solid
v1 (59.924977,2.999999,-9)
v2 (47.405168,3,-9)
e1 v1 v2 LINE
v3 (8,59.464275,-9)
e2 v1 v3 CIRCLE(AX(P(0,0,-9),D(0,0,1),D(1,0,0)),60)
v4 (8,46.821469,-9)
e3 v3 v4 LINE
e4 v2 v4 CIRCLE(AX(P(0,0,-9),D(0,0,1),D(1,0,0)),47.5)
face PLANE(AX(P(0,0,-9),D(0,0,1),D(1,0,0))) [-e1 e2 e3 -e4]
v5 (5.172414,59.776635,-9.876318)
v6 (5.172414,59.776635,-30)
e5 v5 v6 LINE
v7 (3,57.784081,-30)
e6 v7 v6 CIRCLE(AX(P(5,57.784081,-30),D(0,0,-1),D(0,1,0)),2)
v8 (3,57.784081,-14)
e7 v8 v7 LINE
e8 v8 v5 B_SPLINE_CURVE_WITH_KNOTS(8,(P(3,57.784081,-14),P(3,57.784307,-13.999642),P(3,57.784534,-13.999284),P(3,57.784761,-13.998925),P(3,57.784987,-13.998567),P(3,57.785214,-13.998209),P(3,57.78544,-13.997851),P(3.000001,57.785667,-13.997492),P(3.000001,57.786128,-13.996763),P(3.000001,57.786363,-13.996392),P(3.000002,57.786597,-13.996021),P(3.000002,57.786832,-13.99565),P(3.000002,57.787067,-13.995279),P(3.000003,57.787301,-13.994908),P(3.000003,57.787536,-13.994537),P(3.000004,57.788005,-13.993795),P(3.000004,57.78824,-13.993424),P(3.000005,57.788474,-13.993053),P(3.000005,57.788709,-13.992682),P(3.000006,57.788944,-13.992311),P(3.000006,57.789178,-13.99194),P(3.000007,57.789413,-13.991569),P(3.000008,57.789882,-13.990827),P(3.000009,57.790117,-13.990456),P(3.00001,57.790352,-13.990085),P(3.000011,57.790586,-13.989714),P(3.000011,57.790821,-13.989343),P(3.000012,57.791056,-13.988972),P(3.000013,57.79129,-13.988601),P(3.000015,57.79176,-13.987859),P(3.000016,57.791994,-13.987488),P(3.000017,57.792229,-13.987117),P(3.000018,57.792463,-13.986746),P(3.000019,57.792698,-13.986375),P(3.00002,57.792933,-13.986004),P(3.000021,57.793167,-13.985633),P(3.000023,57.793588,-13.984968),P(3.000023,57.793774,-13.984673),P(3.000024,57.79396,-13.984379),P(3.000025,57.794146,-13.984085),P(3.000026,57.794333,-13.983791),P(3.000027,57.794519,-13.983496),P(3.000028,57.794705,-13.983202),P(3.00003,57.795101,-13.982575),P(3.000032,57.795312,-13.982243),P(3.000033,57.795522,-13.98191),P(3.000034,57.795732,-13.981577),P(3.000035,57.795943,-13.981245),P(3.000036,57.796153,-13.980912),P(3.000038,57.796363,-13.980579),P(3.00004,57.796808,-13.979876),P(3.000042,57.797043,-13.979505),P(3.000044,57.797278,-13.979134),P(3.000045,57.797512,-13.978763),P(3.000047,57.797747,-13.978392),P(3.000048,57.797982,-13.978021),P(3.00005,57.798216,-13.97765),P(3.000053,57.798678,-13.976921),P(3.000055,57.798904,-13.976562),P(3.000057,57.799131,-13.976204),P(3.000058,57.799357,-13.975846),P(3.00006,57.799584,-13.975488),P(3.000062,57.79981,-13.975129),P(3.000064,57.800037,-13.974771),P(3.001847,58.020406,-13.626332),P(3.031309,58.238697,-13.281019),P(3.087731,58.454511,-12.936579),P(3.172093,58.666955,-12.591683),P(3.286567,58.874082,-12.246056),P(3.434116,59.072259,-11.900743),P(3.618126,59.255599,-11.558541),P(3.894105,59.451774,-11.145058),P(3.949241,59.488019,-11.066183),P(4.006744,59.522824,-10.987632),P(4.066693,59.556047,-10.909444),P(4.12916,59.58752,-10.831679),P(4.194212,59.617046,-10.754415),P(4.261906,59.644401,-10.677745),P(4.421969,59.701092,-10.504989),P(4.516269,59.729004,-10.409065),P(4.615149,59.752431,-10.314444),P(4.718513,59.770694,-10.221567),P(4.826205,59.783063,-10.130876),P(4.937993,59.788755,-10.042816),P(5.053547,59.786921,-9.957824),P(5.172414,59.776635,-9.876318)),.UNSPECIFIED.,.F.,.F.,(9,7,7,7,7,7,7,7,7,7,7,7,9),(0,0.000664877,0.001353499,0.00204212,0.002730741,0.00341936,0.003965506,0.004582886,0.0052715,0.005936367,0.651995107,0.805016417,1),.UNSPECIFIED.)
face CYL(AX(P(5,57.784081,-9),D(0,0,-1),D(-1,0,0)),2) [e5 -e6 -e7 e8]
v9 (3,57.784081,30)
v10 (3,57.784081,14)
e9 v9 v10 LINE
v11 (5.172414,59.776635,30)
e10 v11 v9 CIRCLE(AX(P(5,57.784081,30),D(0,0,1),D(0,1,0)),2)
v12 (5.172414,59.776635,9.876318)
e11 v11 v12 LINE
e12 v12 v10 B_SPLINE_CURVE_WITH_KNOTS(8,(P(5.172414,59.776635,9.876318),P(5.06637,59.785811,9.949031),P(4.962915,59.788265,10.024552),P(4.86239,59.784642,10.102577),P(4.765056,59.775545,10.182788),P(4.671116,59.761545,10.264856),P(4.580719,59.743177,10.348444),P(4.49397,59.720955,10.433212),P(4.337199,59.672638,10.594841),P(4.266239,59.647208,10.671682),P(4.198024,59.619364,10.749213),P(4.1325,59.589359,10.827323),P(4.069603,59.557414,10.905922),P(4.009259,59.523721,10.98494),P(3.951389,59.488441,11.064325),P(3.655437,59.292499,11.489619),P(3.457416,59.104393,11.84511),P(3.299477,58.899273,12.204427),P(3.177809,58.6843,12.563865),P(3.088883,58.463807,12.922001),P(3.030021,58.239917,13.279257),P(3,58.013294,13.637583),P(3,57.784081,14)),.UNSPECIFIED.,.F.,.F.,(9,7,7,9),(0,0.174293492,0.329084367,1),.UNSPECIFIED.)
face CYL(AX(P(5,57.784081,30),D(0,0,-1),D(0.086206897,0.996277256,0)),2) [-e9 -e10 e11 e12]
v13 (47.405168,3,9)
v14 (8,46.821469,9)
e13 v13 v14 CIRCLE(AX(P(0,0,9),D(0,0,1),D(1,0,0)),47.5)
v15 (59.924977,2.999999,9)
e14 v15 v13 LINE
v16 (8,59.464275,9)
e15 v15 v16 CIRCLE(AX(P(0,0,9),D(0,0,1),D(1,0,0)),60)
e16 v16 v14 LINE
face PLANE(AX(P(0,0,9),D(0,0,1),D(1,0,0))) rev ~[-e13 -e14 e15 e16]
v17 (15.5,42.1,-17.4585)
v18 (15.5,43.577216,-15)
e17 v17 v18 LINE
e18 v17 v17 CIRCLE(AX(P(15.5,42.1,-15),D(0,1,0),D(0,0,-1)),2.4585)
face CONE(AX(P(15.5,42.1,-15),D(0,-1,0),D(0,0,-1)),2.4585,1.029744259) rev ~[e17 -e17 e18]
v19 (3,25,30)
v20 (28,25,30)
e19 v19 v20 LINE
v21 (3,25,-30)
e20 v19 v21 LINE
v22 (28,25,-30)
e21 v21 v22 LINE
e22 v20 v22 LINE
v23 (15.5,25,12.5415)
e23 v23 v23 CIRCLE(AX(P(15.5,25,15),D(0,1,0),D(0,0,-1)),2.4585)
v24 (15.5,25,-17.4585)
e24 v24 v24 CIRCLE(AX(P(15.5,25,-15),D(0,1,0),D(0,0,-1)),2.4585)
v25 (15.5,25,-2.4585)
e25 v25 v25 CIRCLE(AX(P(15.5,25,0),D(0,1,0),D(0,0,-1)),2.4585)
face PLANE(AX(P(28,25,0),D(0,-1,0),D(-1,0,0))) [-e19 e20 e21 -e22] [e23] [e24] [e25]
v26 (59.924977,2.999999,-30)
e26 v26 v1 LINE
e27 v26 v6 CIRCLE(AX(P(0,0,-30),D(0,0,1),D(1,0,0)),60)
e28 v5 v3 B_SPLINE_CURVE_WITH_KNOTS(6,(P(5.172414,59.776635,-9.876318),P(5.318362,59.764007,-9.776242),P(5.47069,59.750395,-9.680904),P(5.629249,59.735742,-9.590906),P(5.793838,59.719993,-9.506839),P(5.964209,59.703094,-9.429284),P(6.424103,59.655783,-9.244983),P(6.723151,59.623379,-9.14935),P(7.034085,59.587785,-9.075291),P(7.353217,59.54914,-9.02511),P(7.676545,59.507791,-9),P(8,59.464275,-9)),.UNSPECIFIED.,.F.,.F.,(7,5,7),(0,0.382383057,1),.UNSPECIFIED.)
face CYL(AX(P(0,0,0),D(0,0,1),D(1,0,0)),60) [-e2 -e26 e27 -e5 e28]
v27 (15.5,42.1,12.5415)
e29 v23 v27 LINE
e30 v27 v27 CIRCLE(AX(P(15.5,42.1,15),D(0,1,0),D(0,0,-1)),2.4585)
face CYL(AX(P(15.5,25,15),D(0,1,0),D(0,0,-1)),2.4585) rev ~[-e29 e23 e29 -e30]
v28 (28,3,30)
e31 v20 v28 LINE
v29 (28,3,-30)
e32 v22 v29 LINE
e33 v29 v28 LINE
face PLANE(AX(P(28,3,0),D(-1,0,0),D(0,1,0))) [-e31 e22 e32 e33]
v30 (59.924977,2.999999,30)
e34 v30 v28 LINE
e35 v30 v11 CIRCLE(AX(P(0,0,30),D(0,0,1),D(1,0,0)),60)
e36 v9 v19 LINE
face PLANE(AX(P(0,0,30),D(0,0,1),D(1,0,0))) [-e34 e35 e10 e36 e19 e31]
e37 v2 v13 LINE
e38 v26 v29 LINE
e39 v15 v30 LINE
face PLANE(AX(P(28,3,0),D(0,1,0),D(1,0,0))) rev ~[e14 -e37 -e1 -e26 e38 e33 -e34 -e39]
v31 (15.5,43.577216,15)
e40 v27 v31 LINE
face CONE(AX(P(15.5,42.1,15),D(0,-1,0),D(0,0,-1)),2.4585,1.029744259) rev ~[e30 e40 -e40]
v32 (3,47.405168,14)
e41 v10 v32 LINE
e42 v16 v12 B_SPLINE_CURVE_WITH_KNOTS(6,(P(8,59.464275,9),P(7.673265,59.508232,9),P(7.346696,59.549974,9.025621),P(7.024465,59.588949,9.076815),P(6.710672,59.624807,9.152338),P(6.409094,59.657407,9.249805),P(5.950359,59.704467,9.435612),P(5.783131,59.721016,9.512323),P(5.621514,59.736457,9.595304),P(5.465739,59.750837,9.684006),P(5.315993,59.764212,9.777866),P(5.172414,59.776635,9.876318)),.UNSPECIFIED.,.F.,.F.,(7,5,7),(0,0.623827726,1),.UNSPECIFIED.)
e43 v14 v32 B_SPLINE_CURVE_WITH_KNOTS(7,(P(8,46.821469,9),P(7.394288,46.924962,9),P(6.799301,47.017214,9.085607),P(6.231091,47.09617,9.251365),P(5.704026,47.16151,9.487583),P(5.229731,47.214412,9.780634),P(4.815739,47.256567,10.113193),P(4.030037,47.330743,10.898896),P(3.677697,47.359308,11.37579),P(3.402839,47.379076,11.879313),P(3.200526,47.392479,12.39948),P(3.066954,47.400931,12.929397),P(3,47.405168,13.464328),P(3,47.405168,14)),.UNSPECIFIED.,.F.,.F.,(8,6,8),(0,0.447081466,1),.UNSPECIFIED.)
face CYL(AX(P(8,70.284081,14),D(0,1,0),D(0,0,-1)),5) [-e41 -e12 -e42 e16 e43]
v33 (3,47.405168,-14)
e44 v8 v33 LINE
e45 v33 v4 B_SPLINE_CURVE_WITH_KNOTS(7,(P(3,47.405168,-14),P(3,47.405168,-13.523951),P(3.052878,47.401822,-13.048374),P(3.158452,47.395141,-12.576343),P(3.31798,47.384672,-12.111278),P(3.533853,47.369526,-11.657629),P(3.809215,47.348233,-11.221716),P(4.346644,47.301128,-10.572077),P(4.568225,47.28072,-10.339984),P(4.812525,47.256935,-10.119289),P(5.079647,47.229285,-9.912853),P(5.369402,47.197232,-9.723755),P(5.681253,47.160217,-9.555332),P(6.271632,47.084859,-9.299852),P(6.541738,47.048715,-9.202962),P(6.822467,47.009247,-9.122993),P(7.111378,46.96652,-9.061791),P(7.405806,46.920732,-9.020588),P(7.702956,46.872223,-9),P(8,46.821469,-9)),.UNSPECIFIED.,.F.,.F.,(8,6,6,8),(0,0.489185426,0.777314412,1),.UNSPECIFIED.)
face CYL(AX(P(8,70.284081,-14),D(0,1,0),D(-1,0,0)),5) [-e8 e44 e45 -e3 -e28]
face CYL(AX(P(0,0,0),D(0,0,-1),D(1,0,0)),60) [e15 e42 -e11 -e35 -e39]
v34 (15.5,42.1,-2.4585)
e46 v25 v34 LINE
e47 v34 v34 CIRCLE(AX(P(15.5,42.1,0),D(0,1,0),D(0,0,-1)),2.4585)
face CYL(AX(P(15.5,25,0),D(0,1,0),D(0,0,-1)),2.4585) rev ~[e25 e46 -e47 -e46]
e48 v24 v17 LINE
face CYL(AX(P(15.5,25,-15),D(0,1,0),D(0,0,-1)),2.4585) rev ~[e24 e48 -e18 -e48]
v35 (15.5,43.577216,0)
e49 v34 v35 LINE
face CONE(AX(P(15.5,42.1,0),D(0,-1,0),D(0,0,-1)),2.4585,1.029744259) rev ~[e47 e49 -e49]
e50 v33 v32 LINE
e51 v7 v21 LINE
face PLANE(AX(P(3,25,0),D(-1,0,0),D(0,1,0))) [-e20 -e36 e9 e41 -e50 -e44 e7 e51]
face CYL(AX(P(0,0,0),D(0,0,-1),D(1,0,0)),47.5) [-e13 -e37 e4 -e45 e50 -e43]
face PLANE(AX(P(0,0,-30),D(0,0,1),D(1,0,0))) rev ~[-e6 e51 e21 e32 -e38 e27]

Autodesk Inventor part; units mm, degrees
ref_plane "YZ Plane" through (0, 0, 0) normal (1, 0, 0) x (0, 1, 0)
ref_plane "XZ Plane" through (0, 0, 0) normal (0, 1, 0) x (-1, 0, 0)
sketch "Sketch15" plane through (0, 0, 0) normal (0, 0, 1) x (1, 0, 0)
  circle A0 centre (0, 0) radius 60
  dimension "d88" = 120
extrude "Extrusion7" add sketch "Sketch15" along normal mid plane 60
ref_plane "Work Plane1" through (0, 0, 0) normal (0, 0, 1) x (1, 0, 0)
sketch "Sketch16" plane through (0, 0, 0) normal (0, 0, 1) x (1, 0, 0)
  circle A0 centre (0, 0) radius 60 projected
  circle A1 centre (0, 0) radius 47.5
  dimension "d117" = 95
extrude "Extrusion8" cut sketch "Sketch16" along normal mid plane 18
sketch "Sketch17" plane through (0, 0, 0) normal (0, 0, 1) x (1, 0, 0)
  circle A0 centre (0, 0) radius 60 projected
  line L0 (3, 3) -> (59.925, 3)
  line L1 (3, 3) -> (3, 59.925)
  line L2 (28, 25) -> (0, 25)
  line L3 (0, 25) -> (0, 0)
  line L4 (0, 0) -> (28, 0)
  line L5 (28, 0) -> (28, 25)
  point P0 (28, 3)
  point P1 (3, 25)
  dimension "d118" = 3
  dimension "d119" = 3
  dimension "d120" = 22
  dimension "d121" = 25
extrude "Extrusion9" cut sketch "Sketch17" along normal through all both and the other way through all contours A0 L1 L2 L3 L4 L5 L0 | L5 L4 L3 L2 L1 L0 | L0 L1 L2 L5
sketch "Sketch19" plane through (3, 25, 30) normal (0, -1, 0) x (1, 0, 0)
  line L0 (0, -60) -> (0, 0) projected
  point P0 (-3, -30)
  point P1 (12.5, -15)
  point P2 (12.5, -45)
  point P3 (0, -30)
  point P4 (12.5, -30)
  point P5 (0, -30)
  dimension "d122" = 30
  dimension "d123" = 15
  dimension "d124" = 12.5
hole "Hole6" at (15.5, 25, 15) at (15.5, 25, -15) at (15.5, 25, 0) direction (0, 1, 0) diameter 4.917 depth 17.1 tip angle 118 thread size "M6x1" class "6H" standard "TS profile"
fillet "Fillet4" radius 2 2 edges at (3, 59.925, -19.5) (3, 59.925, 19.5)
fillet "Fillet5" radius 5 2 edges at (3, 52.5946, -9) (3, 52.5946, 9)
equation "\"d123\" = 0.5 * d122"
properties part number "TL20240701-10110CV-029" material "S45C"
